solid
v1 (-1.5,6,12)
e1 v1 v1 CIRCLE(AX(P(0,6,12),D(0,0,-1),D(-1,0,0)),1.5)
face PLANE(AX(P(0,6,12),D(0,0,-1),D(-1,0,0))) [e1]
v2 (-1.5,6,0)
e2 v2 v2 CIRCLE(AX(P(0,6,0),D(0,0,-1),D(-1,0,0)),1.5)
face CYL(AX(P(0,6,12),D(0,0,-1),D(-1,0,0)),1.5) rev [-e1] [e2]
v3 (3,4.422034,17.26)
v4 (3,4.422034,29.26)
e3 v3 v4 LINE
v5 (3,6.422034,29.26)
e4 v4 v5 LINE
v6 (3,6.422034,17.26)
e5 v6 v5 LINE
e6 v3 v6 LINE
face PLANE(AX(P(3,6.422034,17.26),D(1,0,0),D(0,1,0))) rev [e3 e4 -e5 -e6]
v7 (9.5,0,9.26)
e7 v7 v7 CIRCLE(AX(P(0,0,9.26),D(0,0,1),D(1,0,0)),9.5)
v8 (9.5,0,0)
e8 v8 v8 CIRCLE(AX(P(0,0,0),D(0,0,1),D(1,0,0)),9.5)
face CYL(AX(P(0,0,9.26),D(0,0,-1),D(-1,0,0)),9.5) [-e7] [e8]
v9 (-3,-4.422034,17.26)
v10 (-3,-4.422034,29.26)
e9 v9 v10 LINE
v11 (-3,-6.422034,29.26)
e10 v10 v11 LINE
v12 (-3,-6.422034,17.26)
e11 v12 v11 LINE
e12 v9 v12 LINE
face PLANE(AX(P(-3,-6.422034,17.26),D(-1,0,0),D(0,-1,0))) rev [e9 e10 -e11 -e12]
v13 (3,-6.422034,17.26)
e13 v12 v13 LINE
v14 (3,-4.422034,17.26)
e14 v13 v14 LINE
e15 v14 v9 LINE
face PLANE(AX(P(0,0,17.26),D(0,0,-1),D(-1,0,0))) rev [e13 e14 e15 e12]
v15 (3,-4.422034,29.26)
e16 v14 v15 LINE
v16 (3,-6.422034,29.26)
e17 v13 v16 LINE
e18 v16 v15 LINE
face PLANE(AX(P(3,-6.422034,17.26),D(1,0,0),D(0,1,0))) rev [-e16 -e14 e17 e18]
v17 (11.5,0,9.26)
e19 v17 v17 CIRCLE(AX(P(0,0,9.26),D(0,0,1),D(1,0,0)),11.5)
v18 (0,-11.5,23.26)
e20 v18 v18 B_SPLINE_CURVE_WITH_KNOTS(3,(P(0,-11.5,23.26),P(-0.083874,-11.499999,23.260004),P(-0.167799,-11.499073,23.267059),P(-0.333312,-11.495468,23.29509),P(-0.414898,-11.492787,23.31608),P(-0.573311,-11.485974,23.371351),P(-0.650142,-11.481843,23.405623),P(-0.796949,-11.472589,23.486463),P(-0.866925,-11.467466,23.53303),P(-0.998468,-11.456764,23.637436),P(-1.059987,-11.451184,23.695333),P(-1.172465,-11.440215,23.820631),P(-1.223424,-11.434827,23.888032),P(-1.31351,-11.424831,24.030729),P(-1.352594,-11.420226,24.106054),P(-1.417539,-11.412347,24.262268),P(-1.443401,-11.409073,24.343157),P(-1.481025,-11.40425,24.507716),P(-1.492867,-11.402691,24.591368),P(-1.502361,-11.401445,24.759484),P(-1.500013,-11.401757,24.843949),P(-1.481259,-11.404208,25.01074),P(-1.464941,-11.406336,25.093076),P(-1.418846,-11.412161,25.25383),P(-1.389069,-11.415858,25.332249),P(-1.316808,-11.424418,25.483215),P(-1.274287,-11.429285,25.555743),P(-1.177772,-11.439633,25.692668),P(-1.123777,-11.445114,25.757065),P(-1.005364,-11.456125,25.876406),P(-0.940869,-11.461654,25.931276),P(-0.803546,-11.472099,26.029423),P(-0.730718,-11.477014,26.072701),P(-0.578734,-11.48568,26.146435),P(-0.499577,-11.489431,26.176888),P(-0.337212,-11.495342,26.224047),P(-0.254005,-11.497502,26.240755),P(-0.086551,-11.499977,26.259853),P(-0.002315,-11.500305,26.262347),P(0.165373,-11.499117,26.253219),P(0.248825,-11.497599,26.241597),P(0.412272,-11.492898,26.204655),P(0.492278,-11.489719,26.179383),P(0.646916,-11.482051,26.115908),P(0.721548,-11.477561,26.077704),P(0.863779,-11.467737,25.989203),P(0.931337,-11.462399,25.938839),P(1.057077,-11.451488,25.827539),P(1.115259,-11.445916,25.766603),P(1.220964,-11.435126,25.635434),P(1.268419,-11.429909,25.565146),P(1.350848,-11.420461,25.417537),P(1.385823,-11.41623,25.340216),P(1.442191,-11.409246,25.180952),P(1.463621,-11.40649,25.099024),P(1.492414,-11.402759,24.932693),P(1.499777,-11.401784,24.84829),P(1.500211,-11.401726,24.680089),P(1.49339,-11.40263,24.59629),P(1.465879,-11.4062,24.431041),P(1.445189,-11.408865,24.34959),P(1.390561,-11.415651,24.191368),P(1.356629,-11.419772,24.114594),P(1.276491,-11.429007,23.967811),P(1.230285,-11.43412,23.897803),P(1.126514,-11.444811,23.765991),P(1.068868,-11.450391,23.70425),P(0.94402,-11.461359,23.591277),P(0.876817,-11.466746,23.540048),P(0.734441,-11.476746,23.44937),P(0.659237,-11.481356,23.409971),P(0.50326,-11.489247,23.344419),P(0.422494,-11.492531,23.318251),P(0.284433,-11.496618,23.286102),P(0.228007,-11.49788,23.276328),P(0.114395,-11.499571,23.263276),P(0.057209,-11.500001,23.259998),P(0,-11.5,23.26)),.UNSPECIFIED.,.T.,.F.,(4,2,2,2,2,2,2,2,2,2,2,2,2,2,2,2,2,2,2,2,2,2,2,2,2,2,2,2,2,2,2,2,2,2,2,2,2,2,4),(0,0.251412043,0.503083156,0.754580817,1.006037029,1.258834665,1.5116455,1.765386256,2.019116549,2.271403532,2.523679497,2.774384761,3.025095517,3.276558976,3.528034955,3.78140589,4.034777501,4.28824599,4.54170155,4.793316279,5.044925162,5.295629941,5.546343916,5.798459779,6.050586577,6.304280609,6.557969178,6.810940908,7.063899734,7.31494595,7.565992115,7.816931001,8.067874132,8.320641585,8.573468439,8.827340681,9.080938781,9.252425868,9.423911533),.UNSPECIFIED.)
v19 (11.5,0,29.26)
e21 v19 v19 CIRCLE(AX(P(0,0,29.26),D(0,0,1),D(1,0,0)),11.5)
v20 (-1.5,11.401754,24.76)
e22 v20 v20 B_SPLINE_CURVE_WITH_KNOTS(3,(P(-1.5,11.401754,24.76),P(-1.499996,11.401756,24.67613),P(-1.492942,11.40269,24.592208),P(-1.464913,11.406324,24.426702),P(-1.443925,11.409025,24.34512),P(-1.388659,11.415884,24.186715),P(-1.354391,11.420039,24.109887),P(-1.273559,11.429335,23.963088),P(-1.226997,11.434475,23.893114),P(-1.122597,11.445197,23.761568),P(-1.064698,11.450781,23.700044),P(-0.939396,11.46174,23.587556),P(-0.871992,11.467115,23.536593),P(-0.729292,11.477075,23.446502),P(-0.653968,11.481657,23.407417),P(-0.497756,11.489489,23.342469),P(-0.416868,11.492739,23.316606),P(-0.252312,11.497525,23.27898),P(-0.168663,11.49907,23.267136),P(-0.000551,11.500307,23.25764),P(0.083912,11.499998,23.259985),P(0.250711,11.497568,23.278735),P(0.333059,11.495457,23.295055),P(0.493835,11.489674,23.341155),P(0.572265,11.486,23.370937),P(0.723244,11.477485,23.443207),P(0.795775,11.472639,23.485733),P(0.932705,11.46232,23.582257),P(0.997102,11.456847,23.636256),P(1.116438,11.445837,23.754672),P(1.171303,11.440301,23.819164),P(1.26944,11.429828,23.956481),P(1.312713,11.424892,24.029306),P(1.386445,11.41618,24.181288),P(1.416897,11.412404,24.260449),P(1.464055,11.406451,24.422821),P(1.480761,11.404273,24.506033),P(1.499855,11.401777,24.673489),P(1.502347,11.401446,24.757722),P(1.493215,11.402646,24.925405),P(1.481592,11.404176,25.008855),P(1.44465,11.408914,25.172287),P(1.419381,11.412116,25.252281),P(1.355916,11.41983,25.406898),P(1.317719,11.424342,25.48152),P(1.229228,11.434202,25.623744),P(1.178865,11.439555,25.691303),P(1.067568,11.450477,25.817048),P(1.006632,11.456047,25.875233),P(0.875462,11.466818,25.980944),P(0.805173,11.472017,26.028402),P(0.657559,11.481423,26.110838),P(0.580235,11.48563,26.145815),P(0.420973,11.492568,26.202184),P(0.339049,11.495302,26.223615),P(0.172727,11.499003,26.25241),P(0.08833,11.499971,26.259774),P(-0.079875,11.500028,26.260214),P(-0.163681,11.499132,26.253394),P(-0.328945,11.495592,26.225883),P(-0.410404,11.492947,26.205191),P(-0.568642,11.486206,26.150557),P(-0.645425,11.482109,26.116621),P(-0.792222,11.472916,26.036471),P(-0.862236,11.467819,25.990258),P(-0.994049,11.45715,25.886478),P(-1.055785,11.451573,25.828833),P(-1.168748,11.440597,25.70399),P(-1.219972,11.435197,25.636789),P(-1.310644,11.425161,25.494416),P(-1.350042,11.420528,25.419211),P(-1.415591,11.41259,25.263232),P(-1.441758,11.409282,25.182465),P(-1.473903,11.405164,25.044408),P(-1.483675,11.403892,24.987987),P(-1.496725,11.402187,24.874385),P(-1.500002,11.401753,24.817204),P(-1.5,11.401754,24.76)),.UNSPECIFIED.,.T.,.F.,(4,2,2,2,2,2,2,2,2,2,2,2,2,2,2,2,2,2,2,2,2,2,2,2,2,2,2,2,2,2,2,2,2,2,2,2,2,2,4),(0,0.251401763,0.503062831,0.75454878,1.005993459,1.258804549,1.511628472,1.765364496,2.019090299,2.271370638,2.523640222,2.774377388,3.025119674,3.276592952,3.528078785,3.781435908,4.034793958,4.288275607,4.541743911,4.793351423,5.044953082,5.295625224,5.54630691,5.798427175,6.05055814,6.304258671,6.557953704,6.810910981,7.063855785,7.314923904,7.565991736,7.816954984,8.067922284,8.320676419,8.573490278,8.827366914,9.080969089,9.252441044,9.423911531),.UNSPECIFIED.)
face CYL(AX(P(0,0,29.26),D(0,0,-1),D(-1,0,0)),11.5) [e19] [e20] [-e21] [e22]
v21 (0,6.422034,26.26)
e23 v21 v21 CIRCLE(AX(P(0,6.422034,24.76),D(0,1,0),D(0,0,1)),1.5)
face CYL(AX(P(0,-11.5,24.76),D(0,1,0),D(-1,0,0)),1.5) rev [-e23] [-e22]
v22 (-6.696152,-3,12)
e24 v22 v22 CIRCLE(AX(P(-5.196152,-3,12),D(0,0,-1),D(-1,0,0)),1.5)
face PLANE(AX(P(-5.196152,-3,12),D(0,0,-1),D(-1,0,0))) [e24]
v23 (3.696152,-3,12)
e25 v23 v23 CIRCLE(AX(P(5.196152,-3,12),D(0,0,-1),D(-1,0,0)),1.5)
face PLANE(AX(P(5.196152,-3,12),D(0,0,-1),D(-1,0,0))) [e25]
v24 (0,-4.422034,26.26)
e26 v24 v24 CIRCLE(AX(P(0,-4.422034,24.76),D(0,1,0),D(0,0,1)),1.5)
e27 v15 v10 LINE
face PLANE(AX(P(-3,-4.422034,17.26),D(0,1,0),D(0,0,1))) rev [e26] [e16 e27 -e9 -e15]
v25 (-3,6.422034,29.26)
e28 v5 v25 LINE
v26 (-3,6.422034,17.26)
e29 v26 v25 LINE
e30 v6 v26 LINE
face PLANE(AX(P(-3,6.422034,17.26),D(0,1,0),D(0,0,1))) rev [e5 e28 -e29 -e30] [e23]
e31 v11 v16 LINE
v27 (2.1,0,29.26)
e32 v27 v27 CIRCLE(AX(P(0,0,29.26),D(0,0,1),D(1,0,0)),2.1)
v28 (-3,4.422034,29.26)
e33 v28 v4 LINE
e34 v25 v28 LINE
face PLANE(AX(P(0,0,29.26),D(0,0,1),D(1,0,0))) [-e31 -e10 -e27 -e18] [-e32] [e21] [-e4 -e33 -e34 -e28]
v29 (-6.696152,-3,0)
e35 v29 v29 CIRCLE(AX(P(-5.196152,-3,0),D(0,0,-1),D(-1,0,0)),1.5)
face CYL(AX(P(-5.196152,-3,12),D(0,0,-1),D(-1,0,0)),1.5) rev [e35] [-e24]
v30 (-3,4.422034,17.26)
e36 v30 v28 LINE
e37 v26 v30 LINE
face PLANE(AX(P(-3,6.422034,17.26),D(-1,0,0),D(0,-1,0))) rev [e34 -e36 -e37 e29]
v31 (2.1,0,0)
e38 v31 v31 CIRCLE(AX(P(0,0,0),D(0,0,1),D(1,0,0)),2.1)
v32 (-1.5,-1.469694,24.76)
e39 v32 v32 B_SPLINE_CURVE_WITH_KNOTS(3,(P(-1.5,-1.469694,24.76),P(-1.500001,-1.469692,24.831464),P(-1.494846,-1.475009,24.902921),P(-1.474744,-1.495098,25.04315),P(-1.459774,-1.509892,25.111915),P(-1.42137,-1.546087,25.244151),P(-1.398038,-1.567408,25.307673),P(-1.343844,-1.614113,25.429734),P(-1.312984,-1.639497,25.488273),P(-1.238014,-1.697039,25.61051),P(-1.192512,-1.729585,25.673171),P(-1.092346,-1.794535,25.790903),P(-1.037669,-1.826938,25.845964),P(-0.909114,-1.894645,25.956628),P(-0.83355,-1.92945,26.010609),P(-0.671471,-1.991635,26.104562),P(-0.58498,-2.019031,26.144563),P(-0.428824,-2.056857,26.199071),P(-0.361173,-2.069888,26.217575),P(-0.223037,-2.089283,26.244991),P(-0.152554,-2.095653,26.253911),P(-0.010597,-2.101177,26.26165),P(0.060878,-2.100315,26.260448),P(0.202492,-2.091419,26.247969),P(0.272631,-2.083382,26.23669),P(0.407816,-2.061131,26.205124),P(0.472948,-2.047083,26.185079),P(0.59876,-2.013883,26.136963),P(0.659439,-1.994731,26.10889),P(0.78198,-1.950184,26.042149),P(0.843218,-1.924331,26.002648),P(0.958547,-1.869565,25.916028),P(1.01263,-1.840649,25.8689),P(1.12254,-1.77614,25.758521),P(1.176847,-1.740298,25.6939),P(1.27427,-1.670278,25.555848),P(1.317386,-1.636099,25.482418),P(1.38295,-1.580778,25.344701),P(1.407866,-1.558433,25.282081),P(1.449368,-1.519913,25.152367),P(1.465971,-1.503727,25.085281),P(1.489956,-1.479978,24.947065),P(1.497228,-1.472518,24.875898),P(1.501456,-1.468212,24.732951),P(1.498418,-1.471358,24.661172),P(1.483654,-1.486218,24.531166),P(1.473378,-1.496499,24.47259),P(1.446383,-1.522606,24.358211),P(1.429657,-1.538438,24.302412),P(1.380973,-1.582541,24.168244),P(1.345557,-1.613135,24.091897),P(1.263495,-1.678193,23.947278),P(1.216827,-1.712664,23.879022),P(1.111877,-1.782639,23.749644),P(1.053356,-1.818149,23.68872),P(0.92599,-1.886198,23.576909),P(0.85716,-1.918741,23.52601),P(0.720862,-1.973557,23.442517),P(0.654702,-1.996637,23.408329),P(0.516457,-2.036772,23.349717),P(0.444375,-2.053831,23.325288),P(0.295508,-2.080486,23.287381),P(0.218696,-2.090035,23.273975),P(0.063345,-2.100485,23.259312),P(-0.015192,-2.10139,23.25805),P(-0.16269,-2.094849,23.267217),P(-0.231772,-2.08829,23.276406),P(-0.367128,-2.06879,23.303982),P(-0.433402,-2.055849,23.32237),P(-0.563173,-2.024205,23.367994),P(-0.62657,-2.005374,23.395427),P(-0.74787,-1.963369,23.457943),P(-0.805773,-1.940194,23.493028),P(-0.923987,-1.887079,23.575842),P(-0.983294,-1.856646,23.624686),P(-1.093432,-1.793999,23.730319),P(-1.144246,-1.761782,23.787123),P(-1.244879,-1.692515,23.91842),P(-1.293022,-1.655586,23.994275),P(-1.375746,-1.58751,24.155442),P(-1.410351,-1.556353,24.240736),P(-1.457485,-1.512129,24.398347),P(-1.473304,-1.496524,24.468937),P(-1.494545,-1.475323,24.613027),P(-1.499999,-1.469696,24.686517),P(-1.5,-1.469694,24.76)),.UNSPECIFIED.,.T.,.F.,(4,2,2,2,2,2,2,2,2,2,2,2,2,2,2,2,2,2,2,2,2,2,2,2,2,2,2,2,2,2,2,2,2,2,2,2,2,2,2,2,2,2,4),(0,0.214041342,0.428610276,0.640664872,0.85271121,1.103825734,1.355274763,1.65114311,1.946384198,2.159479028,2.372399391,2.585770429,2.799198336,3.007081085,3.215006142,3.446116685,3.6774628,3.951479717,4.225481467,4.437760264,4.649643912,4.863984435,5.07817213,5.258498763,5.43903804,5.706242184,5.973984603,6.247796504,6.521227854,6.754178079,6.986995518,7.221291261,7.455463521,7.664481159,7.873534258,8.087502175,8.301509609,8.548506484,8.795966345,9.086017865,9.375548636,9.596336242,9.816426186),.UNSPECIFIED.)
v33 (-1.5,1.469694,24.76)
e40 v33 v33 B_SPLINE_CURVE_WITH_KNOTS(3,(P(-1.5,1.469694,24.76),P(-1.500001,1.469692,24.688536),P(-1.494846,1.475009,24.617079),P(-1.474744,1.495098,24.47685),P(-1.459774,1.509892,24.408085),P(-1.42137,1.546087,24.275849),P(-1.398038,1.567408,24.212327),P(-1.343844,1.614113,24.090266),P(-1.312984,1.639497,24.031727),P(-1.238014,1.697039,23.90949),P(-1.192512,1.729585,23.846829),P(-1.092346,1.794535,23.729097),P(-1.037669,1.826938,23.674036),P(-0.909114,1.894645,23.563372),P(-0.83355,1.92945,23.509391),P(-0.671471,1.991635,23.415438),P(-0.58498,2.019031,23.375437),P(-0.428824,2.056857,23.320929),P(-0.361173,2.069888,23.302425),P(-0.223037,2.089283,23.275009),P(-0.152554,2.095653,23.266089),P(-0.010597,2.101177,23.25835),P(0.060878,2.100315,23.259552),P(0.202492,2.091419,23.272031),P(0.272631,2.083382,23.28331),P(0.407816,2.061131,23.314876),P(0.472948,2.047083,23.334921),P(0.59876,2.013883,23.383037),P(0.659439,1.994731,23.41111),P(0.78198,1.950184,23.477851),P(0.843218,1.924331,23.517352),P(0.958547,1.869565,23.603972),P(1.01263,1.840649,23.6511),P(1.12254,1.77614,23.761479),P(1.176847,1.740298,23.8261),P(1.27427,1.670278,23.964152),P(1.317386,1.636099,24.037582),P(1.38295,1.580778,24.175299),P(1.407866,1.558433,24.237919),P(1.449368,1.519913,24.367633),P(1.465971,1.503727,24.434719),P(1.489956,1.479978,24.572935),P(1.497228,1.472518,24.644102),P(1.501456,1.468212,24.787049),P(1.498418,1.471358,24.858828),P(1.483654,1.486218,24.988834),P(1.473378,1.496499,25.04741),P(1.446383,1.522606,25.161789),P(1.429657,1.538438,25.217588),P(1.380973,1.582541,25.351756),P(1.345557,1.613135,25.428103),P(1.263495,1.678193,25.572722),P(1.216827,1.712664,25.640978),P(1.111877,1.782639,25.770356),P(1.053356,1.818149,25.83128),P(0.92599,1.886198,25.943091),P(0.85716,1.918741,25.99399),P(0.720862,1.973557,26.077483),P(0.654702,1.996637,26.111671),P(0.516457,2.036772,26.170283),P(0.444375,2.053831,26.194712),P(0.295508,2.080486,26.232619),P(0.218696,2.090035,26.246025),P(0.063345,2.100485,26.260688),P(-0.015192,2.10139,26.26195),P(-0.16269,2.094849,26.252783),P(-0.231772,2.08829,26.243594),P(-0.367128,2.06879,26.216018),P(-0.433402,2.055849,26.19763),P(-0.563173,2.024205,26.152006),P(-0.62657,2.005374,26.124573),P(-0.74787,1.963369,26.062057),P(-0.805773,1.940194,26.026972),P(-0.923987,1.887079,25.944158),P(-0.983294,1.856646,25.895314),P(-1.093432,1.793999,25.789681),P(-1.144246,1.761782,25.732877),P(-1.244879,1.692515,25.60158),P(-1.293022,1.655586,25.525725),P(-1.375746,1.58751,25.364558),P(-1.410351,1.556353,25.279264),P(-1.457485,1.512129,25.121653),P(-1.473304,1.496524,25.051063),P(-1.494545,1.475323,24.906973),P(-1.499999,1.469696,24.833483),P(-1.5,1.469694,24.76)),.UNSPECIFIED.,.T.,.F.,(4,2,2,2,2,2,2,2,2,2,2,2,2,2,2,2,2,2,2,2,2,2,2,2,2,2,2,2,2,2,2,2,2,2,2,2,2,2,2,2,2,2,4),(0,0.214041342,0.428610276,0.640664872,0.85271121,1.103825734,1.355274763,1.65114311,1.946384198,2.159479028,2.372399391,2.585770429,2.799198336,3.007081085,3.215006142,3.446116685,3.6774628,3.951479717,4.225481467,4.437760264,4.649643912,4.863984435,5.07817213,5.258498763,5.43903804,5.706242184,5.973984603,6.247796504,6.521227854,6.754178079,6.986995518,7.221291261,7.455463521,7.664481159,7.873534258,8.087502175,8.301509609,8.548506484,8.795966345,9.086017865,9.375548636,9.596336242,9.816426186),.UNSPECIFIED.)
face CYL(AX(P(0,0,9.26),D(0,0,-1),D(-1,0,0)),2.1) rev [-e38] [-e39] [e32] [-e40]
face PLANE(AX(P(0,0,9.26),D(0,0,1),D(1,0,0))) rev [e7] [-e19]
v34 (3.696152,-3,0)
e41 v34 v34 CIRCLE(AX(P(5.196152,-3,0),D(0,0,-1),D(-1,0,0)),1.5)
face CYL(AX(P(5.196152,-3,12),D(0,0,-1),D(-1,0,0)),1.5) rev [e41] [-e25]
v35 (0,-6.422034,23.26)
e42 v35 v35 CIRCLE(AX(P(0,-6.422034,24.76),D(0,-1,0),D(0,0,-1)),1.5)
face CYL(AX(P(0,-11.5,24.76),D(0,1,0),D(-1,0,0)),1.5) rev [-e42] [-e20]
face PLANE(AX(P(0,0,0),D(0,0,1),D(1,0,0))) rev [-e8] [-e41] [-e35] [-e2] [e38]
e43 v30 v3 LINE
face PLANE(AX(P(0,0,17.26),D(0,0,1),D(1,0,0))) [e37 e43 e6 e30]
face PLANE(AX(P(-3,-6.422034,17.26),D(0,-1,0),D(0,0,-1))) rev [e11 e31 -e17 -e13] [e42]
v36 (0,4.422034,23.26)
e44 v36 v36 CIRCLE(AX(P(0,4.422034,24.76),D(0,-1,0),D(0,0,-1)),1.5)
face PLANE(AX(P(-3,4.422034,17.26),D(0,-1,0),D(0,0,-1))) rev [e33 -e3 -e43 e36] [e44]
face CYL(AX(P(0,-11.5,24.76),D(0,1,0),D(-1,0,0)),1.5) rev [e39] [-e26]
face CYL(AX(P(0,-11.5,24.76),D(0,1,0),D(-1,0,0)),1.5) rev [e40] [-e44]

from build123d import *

# Parameters (mm, degrees)
SKETCH1_R                 = 9.5
SKETCH1_R_2               = 2.1
BOSS_EXTRUDE1_DEPTH       = 9.26
BOSS_EXTRUDE2_OUTLINE_R   = 11.5
BOSS_EXTRUDE2_OUTLINE_R_2 = 2.1
BOSS_EXTRUDE2_DEPTH       = 20
SKETCH3_W                 = 6
SKETCH3_H                 = 2
CUT_EXTRUDE1_DEPTH        = 12
SKETCH4_R                 = 1.5
CUT_EXTRUDE2_DEPTH        = 39.953788006
SKETCH5_R                 = 1.5
CUT_EXTRUDE3_DEPTH        = 12


# Read off the part's stored shape, not the designer's step: Boss-Extrude2
with BuildPart() as part:
    # Sketch1 → Boss-Extrude1 (new body)
    with BuildSketch(Plane.XY):
        Circle(SKETCH1_R)
        Circle(SKETCH1_R_2, mode=Mode.SUBTRACT)
    extrude(amount=BOSS_EXTRUDE1_DEPTH)

    # Boss-Extrude2 outline → Boss-Extrude2 (add)
    with BuildSketch(Plane.XY.offset(9.26)):
        Circle(BOSS_EXTRUDE2_OUTLINE_R)
        Circle(BOSS_EXTRUDE2_OUTLINE_R_2, mode=Mode.SUBTRACT)
    extrude(amount=BOSS_EXTRUDE2_DEPTH)

    # Sketch3 → Cut-Extrude1 (cut)
    with BuildSketch(Plane.XY.offset(29.26)):
        with Locations((0, 5.422033923)):
            Rectangle(SKETCH3_W, SKETCH3_H)
        with Locations((0, -5.422033923)):
            Rectangle(SKETCH3_W, SKETCH3_H)
    extrude(amount=-CUT_EXTRUDE1_DEPTH, mode=Mode.SUBTRACT)

    # Sketch4 → Cut-Extrude2 (cut, through all)
    with BuildSketch(Plane(origin=(0, 11.5, 0), x_dir=(1, 0, 0), z_dir=(0, 1, 0))):
        with Locations(Location((0, -24.76, 0), (0, 0, 180))):
            Circle(SKETCH4_R)
    extrude(amount=-CUT_EXTRUDE2_DEPTH, mode=Mode.SUBTRACT)

    # Sketch5 → Cut-Extrude3 (cut)
    with BuildSketch(Plane(origin=(0, 0, 0), x_dir=(-1, 0, 0), z_dir=(0, 0, -1))):
        with Locations((0, 6)):
            Circle(SKETCH5_R)
        with Locations((5.196152423, -3)):
            Circle(SKETCH5_R)
        with Locations((-5.196152423, -3)):
            Circle(SKETCH5_R)
    extrude(amount=-CUT_EXTRUDE3_DEPTH, mode=Mode.SUBTRACT)


solid = part.part
